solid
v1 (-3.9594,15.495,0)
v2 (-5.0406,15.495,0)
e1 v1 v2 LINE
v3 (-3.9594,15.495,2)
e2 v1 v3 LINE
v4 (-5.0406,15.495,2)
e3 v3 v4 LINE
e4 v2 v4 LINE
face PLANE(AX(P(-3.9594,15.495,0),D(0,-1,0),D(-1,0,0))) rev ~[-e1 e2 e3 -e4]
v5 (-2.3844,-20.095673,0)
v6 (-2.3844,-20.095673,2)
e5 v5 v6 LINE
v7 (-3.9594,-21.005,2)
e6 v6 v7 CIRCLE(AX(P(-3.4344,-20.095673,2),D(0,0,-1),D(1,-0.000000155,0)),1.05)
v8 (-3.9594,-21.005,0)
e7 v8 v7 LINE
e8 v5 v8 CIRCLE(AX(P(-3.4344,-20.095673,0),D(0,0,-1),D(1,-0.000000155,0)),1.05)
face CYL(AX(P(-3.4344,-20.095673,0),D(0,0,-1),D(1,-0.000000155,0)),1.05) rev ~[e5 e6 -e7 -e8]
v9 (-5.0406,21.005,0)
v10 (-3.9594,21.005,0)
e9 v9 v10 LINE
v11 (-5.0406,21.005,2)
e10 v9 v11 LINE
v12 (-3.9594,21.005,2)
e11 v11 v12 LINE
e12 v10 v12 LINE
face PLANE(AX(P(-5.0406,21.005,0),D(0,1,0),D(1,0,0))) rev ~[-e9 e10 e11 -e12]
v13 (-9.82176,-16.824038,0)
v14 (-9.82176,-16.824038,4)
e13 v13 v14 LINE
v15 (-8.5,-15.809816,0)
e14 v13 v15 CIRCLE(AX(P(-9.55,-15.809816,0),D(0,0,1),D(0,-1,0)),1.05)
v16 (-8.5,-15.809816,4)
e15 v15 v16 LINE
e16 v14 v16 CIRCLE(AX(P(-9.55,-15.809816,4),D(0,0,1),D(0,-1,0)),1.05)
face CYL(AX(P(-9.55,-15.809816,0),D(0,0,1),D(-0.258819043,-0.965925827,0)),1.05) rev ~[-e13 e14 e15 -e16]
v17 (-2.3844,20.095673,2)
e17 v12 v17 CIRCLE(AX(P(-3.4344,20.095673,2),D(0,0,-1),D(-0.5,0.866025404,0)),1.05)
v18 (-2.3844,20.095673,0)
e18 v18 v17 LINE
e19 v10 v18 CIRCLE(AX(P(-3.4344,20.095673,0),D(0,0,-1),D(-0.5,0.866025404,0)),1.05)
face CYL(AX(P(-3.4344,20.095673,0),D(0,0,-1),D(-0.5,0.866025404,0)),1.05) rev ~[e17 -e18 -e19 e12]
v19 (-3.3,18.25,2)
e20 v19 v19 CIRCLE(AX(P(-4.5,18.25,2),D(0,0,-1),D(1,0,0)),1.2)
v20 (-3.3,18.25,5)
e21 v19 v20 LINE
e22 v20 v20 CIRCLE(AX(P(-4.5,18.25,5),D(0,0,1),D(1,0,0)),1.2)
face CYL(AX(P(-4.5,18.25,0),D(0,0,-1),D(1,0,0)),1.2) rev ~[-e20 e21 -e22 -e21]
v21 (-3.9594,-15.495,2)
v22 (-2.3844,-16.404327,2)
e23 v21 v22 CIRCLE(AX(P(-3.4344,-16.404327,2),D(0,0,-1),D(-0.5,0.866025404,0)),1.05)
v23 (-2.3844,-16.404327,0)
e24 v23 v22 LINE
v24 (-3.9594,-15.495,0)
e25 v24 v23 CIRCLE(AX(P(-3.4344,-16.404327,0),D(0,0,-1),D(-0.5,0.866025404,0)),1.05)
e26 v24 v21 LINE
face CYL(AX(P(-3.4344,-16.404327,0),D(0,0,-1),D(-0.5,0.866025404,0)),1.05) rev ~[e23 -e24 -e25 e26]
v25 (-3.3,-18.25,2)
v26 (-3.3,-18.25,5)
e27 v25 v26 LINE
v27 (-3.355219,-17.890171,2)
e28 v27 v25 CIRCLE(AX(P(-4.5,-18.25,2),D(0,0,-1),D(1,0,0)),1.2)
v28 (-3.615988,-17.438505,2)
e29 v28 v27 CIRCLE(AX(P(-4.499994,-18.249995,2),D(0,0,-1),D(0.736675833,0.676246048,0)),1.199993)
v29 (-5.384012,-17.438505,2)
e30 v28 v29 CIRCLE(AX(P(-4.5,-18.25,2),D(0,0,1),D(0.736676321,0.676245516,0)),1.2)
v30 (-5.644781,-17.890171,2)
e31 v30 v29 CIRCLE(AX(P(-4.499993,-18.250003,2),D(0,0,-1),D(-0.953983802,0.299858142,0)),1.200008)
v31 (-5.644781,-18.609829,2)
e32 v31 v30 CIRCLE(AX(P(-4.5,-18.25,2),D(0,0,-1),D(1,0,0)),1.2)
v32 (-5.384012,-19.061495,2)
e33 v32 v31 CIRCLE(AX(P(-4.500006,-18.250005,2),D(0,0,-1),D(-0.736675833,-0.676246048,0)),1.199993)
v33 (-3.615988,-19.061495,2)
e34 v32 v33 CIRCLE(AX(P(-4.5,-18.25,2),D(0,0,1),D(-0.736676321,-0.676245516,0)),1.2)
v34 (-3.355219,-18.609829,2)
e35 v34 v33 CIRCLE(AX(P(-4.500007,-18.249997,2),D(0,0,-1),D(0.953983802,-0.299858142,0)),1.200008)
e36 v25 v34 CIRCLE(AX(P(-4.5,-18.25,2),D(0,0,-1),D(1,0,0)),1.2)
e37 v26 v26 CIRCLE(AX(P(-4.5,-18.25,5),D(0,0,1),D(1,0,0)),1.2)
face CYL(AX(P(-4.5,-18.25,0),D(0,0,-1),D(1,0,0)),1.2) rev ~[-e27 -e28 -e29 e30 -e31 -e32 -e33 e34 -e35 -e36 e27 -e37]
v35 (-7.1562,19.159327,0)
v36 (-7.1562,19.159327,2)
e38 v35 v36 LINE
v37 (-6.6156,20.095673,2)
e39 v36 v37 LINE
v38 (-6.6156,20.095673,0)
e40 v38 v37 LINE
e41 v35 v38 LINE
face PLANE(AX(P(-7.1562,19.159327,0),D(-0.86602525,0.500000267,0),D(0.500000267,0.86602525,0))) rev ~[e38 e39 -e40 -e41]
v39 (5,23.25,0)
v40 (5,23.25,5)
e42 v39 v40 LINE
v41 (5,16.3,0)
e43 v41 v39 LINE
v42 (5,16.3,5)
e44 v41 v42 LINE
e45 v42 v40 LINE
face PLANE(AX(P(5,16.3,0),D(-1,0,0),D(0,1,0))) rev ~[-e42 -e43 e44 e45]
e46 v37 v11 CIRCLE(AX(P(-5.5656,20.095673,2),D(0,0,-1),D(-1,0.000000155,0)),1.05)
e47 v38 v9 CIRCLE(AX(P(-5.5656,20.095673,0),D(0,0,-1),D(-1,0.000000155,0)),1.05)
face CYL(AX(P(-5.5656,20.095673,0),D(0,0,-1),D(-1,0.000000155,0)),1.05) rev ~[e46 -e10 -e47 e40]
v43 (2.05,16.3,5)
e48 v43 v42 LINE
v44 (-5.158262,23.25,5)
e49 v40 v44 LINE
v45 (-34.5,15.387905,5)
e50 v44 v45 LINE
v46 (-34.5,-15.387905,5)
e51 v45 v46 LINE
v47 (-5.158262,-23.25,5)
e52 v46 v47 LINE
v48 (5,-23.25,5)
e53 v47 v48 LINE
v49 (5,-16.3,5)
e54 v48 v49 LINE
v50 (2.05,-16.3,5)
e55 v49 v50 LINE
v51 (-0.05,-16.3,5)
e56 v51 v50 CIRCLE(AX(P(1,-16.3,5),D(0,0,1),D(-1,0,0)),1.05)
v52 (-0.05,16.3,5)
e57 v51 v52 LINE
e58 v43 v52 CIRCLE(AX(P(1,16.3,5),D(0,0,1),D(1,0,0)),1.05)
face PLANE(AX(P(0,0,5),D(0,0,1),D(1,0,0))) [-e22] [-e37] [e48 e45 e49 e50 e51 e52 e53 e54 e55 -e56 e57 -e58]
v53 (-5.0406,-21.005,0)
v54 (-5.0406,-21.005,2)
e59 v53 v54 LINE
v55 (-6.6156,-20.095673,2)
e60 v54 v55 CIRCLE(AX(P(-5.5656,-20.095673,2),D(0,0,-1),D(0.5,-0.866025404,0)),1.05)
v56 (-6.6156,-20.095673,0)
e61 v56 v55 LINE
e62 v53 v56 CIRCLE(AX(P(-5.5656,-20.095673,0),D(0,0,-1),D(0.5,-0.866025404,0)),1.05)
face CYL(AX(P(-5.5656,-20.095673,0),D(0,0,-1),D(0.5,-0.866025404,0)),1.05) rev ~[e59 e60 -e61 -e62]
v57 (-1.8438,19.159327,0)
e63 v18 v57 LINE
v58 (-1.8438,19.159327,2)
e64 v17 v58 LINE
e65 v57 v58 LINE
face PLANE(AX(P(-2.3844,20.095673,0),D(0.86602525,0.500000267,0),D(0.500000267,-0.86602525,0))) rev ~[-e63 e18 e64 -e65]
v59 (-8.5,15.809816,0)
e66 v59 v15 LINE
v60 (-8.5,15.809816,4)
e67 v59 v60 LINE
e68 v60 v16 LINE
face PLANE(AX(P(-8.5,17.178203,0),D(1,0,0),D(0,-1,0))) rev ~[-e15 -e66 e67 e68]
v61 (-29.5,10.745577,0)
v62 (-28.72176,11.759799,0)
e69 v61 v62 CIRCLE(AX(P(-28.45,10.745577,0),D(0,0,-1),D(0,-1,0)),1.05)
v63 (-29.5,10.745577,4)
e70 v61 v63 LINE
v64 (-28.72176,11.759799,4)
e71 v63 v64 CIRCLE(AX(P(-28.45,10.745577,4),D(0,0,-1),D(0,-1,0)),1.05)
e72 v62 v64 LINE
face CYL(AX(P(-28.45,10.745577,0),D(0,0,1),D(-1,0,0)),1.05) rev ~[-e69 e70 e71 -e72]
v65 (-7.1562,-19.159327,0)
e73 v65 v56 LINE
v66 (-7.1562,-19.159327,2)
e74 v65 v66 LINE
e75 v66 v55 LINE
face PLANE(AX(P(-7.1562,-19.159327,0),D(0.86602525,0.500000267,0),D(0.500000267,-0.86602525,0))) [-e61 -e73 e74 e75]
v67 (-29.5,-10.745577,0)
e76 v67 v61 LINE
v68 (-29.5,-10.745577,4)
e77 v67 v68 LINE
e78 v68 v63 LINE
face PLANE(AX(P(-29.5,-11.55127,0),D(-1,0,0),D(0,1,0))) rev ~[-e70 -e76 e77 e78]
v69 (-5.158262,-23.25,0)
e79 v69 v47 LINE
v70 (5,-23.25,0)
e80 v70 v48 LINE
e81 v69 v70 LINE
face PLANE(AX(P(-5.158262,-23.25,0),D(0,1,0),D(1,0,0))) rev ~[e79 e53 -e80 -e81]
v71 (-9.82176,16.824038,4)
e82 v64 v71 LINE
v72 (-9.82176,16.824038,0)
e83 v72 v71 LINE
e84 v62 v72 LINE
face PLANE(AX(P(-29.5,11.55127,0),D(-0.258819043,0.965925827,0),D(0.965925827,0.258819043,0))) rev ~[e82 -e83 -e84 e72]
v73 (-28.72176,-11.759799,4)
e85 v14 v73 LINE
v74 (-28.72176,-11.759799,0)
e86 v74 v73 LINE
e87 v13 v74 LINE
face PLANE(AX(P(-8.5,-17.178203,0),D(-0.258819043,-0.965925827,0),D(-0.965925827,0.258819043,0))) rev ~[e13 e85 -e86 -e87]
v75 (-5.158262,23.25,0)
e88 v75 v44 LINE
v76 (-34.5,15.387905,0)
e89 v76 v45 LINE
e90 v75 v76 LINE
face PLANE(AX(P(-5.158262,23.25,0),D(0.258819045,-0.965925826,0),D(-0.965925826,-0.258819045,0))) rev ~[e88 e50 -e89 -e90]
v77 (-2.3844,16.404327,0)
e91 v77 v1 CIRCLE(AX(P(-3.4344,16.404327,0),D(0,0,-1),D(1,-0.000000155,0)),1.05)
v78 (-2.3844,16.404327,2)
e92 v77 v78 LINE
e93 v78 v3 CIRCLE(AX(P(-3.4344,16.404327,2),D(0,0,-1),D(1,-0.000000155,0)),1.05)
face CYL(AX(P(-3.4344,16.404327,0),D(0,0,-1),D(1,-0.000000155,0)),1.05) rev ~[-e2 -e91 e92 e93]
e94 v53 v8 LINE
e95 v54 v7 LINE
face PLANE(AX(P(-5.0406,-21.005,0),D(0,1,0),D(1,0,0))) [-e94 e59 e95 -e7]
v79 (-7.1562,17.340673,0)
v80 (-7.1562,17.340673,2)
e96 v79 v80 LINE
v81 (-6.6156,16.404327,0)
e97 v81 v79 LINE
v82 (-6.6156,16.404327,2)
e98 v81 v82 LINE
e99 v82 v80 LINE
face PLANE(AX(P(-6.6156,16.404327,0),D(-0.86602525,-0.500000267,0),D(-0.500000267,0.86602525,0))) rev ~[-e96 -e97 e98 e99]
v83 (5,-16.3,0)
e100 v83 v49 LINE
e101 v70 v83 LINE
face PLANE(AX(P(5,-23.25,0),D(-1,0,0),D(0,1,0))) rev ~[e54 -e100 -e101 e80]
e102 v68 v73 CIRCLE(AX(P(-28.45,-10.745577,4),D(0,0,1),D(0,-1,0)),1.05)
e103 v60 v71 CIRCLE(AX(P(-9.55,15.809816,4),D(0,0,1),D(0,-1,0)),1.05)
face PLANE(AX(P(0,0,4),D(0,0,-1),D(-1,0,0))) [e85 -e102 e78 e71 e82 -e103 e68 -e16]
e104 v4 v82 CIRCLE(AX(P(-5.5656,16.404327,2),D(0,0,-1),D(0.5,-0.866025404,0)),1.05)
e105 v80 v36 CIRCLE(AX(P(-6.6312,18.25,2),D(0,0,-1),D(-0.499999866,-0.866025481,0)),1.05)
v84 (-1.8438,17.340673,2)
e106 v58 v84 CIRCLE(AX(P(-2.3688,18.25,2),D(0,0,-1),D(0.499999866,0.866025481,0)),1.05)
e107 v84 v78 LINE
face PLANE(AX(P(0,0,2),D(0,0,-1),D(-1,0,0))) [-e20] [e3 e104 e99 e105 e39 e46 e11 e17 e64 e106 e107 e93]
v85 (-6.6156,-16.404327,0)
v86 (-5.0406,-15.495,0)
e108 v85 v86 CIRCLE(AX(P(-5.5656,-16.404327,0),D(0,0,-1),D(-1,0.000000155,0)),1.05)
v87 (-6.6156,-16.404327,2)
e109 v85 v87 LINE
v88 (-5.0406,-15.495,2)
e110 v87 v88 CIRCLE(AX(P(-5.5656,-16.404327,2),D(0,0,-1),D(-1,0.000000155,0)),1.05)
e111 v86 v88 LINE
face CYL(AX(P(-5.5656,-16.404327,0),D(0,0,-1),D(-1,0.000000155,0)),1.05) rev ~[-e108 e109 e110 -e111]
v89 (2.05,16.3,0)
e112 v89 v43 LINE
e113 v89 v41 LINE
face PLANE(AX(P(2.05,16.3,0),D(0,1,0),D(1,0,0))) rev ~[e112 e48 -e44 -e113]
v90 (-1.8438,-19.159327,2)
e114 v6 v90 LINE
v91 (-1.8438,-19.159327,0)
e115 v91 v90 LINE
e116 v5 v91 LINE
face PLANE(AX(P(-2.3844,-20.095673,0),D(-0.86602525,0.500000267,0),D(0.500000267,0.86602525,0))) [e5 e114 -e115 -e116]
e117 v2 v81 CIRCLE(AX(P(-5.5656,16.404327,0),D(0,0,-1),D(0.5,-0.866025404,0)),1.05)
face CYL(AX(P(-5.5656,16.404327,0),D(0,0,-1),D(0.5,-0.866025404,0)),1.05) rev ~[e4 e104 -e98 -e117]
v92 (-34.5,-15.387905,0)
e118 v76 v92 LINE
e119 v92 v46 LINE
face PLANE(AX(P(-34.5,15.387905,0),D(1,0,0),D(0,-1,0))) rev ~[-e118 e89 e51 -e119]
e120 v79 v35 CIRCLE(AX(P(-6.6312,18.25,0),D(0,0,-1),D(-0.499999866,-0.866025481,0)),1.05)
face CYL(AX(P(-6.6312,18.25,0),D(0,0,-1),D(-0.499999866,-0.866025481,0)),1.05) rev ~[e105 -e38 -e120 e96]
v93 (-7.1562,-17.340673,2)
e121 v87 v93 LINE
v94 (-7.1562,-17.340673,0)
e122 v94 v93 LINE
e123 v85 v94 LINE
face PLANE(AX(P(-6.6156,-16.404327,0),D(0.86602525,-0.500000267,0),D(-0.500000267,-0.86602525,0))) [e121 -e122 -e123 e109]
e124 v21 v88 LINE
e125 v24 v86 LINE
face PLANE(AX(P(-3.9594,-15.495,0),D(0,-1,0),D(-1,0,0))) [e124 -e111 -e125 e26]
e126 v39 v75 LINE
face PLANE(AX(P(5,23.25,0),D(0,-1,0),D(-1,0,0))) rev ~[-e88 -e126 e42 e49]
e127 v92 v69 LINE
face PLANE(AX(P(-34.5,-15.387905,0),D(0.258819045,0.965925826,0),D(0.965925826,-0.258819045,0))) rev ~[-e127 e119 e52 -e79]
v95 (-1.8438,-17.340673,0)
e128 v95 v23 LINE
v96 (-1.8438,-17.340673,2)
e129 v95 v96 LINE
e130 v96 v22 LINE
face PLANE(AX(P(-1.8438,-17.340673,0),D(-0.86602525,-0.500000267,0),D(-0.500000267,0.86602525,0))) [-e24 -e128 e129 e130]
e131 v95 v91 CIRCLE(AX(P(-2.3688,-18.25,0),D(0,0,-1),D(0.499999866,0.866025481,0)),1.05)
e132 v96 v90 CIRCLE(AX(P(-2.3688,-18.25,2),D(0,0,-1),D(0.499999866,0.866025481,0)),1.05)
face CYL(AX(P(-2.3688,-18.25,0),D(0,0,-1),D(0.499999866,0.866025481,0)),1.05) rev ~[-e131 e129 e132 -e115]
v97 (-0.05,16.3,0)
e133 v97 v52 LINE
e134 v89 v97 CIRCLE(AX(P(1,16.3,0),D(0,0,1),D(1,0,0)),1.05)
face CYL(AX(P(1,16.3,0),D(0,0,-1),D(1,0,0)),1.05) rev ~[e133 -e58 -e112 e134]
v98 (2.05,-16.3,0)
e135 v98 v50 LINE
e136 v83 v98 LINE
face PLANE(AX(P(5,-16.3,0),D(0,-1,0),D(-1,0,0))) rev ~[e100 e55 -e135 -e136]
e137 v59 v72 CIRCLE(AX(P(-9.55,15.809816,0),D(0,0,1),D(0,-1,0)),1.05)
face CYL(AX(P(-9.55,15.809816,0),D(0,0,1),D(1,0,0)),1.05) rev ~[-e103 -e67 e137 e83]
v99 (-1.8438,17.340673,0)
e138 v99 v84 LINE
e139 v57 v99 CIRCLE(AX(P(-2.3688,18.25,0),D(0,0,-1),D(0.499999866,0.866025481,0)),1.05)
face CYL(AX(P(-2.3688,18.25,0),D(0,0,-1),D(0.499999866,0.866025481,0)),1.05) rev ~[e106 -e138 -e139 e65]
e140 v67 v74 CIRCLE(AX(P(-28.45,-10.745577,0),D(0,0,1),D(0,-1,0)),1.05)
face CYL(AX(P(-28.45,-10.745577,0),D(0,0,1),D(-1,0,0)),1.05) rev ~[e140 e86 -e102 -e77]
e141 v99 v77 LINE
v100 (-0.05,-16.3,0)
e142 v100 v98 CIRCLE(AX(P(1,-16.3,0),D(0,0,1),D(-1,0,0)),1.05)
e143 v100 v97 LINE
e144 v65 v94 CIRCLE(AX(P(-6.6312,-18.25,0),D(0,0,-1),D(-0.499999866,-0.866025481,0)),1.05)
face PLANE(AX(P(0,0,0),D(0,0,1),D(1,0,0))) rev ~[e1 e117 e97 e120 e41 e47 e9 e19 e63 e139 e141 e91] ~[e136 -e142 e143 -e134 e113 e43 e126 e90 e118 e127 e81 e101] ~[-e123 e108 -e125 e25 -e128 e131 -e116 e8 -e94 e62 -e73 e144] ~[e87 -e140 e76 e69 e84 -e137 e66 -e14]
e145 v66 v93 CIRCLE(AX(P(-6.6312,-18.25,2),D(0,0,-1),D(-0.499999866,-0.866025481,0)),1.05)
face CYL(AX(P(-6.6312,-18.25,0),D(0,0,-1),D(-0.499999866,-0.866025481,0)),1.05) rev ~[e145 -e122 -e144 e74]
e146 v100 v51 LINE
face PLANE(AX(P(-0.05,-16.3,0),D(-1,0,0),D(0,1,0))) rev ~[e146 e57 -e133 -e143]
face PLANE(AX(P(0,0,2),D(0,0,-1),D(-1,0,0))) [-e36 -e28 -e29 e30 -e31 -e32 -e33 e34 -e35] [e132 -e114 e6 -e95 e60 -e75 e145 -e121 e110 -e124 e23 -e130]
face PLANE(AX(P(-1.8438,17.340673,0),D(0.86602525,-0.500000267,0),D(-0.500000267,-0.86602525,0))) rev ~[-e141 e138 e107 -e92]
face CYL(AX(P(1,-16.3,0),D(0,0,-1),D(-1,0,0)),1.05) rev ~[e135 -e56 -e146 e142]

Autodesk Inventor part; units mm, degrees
ref_plane "YZ Plane" through (0, 0, 0) normal (1, 0, 0) x (0, 1, 0)
ref_plane "XZ Plane" through (0, 0, 0) normal (0, 1, 0) x (-1, 0, 0)
ref_plane "XY Plane" through (0, 0, 0) normal (0, 0, 1) x (1, 0, 0)
sketch "スケッチ1" plane through (0, 0, 0) normal (0, 0, 1) x (1, 0, 0)
  line L0 (0, 16.25) -> (28.465632, 16.25) construction
  line L1 (28.465632, 16.25) -> (28.465632, -16.25) construction
  line L2 (28.465632, -16.25) -> (0, -16.25) construction
  line L3 (0, -16.25) -> (0, 16.25) construction
  line L4 (5, 23.25) -> (-5.158262, 23.25)
  line L5 (-5.158262, 23.25) -> (-34.5, 15.387905)
  line L6 (-34.5, 15.387905) -> (-34.5, -15.387905)
  line L7 (-34.5, -15.387905) -> (-5.158262, -23.25)
  line L8 (-5.158262, -23.25) -> (5, -23.25)
  line L9 (5, -23.25) -> (5, -16.3)
  line L10 (5, -16.3) -> (2.05, -16.3)
  arc A0 (-0.05, -16.3) -> (2.05, -16.3) centre (1, -16.3) ccw
  line L11 (-0.05, -16.3) -> (-0.05, 16.3)
  arc A1 (2.05, 16.3) -> (-0.05, 16.3) centre (1, 16.3) ccw
  line L12 (28.465632, 0) -> (0, 0) construction
  line L13 (2.05, 16.3) -> (5, 16.3)
  line L14 (5, 16.3) -> (5, 23.25)
  line L15 (28.515632, 16.3) -> (-0.05, 16.3) construction
  line L16 (-0.05, 16.3) -> (-0.05, -16.3) construction
  line L17 (-0.05, -16.3) -> (28.515632, -16.3) construction
  line L18 (28.515632, -16.3) -> (28.515632, 16.3) construction
  circle A2 centre (-4.5, 18.25) radius 1.2
  circle A3 centre (-4.5, -18.25) radius 1.2
  line L19 (0, 0) -> (28.465632, 0) construction
  line L20 (2.5, 16.25) -> (2.5, -16.25) construction
  circle A4 centre (-4.5, 18.25) radius 5 construction
  line L21 (-6.087713, 15.5) -> (-7.675426, 18.25)
  line L22 (-7.675426, 18.25) -> (-6.087713, 21)
  line L23 (-6.087713, 21) -> (-2.912287, 21)
  line L24 (-2.912287, 21) -> (-1.324574, 18.25)
  line L25 (-1.324574, 18.25) -> (-2.912287, 15.5)
  line L26 (-2.912287, 15.5) -> (-6.087713, 15.5)
  point P0 (-34.5, 0)
  point P1 (-0.05, 0)
  dimension "d98" = 32.5
  dimension "d100" = 0.05
  dimension "d101" = 1.05
  dimension "d102" = 5
  dimension "d104" = 2.4
  dimension "d106" = 2.5
  dimension "d107" = 7
  dimension "d108" = 18.25
  dimension "d109" = 5
  dimension "d110" = 30
  dimension "d111" = 165
  dimension "d130" = 5.5
extrude "押し出し1" add sketch "スケッチ1" along normal blind 5 contours L14 L13 A1 L11 A0 L10 L9 L8 L7 L6 L5 L4 | L21 L22 L23 L24 L25 L26
sketch "スケッチ6" plane through (0, 0, 0) normal (0, 0, -1) x (-1, 0, 0)
  line L0 (34.5, -15.387905) -> (5.158262, -23.25)
  line L1 (34.5, 15.387905) -> (34.5, -15.387905)
  line L2 (5.158262, 23.25) -> (34.5, 15.387905)
  line L3 (8.5, 17.178203) -> (8.5, -17.178203)
  line L4 (8.5, -17.178203) -> (29.5, -11.55127)
  line L5 (29.5, -11.55127) -> (29.5, 11.55127)
  line L6 (29.5, 11.55127) -> (8.5, 17.178203)
  circle A0 centre (4.5, 18.25) radius 1.2
  point P0 (0, 0)
  dimension "d113" = 5
  dimension "d114" = 5
  dimension "d115" = 5
  dimension "d133" = 4
extrude "押し出し4" cut sketch "スケッチ6" against normal blind 4 contours L6 L5 L4 L3
fillet "フィレット2" radius 1.05 4 edges at (-8.5, 17.1782, 2) (-8.5, -17.1782, 2) (-29.5, 11.5513, 2) (-29.5, -11.5513, 2)
sketch "スケッチ7" plane through (0, 0, 0) normal (0, 0, -1) x (-1, 0, 0)
  circle A0 centre (4.5, -18.25) radius 1.2
  circle A1 centre (4.5, 18.25) radius 1.2
  line L0 (2.912287, 15.5) -> (1.324574, 18.25)
  line L1 (1.324574, 18.25) -> (2.912287, 21)
  line L2 (2.912287, 21) -> (6.087713, 21)
  line L3 (6.087713, 21) -> (7.675426, 18.25)
  line L4 (7.675426, 18.25) -> (6.087713, 15.5)
  line L5 (6.087713, 15.5) -> (2.912287, 15.5)
  line L6 (7.6812, 18.25) -> (6.0906, 21.005)
  line L7 (6.0906, 21.005) -> (2.9094, 21.005)
  line L8 (2.9094, 21.005) -> (1.3188, 18.25)
  line L9 (1.3188, 18.25) -> (2.9094, 15.495)
  line L10 (2.9094, 15.495) -> (6.0906, 15.495)
  line L11 (6.0906, 15.495) -> (7.6812, 18.25)
  circle A2 centre (6.6312, 18.25) radius 1.05
  circle A3 centre (5.5656, 20.095673) radius 1.05
  circle A4 centre (3.4344, 20.095673) radius 1.05
  circle A5 centre (2.3688, 18.25) radius 1.05
  circle A6 centre (3.4344, 16.404327) radius 1.05
  circle A7 centre (5.5656, 16.404327) radius 1.05
  line L12 (7.6812, -18.25) -> (6.0906, -21.005)
  line L13 (6.0906, -21.005) -> (2.9094, -21.005)
  line L14 (2.9094, -21.005) -> (1.3188, -18.25)
  line L15 (1.3188, -18.25) -> (2.9094, -15.495)
  line L16 (2.9094, -15.495) -> (6.0906, -15.495)
  line L17 (6.0906, -15.495) -> (7.6812, -18.25)
  circle A8 centre (6.6312, -18.25) radius 1.05
  circle A9 centre (5.5656, -16.404327) radius 1.05
  circle A10 centre (3.4344, -16.404327) radius 1.05
  circle A11 centre (2.3688, -18.25) radius 1.05
  circle A12 centre (3.4344, -20.095673) radius 1.05
  circle A13 centre (5.5656, -20.095673) radius 1.05
  point P0 (0, 0)
  point P1 (6.0906, 21.005)
  point P2 (2.9094, 21.005)
  point P3 (1.3188, 18.25)
  point P4 (2.9094, 15.495)
  point P5 (6.0906, 15.495)
  point P6 (2.9094, -15.495)
  point P7 (2.9094, -21.005)
  point P8 (6.0906, -21.005)
  dimension "d121" = 2.1
  dimension "d119" = 5.5
  dimension "d120" = 0.005
  dimension "d124" = 360
  dimension "d128" = 360
sketch "スケッチ7 outline for 押し出し5" plane through (0, 0, 0) normal (0, 0, -1) x (-1, 0, 0)
  arc A0 (6.6156, 20.095673) -> (5.0406, 21.005) centre (5.5656, 20.095673) ccw
  line L0 (5.0406, 21.005) -> (3.9594, 21.005)
  arc A1 (3.9594, 21.005) -> (2.3844, 20.095673) centre (3.4344, 20.095673) ccw
  line L1 (2.3844, 20.095673) -> (1.8438, 19.159327)
  arc A2 (1.8438, 19.159327) -> (1.8438, 17.340673) centre (2.3688, 18.25) ccw
  line L2 (1.8438, 17.340673) -> (2.3844, 16.404327)
  arc A3 (2.3844, 16.404327) -> (3.9594, 15.495) centre (3.4344, 16.404327) ccw
  line L3 (3.9594, 15.495) -> (5.0406, 15.495)
  arc A4 (5.0406, 15.495) -> (6.6156, 16.404327) centre (5.5656, 16.404327) ccw
  line L4 (6.6156, 16.404327) -> (7.1562, 17.340673)
  arc A5 (7.1562, 17.340673) -> (7.1562, 19.159327) centre (6.6312, 18.25) ccw
  line L5 (7.1562, 19.159327) -> (6.6156, 20.095673)
  arc A6 (6.6156, -16.404327) -> (5.0406, -15.495) centre (5.5656, -16.404327) ccw
  line L6 (3.9594, -15.495) -> (5.0406, -15.495)
  arc A7 (3.9594, -15.495) -> (2.3844, -16.404327) centre (3.4344, -16.404327) ccw
  line L7 (1.8438, -17.340673) -> (2.3844, -16.404327)
  arc A8 (1.8438, -17.340673) -> (1.8438, -19.159327) centre (2.3688, -18.25) ccw
  line L8 (2.3844, -20.095673) -> (1.8438, -19.159327)
  arc A9 (2.3844, -20.095673) -> (3.9594, -21.005) centre (3.4344, -20.095673) ccw
  line L9 (5.0406, -21.005) -> (3.9594, -21.005)
  arc A10 (5.0406, -21.005) -> (6.6156, -20.095673) centre (5.5656, -20.095673) ccw
  line L10 (7.1562, -19.159327) -> (6.6156, -20.095673)
  arc A11 (7.1562, -19.159327) -> (7.1562, -17.340673) centre (6.6312, -18.25) ccw
  line L11 (6.6156, -16.404327) -> (7.1562, -17.340673)
  arc A12 (5.644781, -17.890171) -> (5.384012, -17.438505) centre (4.5, -18.25) ccw
  arc A13 (5.644781, -17.890171) -> (5.644781, -18.609829) centre (6.6312, -18.25) ccw
  arc A14 (5.384012, -19.061495) -> (5.644781, -18.609829) centre (4.5, -18.25) ccw
  arc A15 (5.384012, -19.061495) -> (4.760769, -19.421324) centre (5.5656, -20.095673) ccw
  arc A16 (4.239231, -19.421324) -> (4.760769, -19.421324) centre (4.5, -18.25) ccw
  arc A17 (4.239231, -19.421324) -> (3.615988, -19.061495) centre (3.4344, -20.095673) ccw
  arc A18 (3.355219, -18.609829) -> (3.615988, -19.061495) centre (4.5, -18.25) ccw
  arc A19 (3.355219, -18.609829) -> (3.355219, -17.890171) centre (2.3688, -18.25) ccw
  arc A20 (3.615988, -17.438505) -> (3.355219, -17.890171) centre (4.5, -18.25) ccw
  arc A21 (3.615988, -17.438505) -> (4.239231, -17.078676) centre (3.4344, -16.404327) ccw
  arc A22 (4.760769, -17.078676) -> (4.239231, -17.078676) centre (4.5, -18.25) ccw
  arc A23 (4.760769, -17.078676) -> (5.384012, -17.438505) centre (5.5656, -16.404327) ccw
extrude "押し出し5" cut sketch "スケッチ7 outline for 押し出し5" against normal blind 2
equation "\"d114\" = d113"
equation "\"d115\" = d113"
properties part number "胴体_サブフレーム_1_7" material "アセタール樹脂、黒"
